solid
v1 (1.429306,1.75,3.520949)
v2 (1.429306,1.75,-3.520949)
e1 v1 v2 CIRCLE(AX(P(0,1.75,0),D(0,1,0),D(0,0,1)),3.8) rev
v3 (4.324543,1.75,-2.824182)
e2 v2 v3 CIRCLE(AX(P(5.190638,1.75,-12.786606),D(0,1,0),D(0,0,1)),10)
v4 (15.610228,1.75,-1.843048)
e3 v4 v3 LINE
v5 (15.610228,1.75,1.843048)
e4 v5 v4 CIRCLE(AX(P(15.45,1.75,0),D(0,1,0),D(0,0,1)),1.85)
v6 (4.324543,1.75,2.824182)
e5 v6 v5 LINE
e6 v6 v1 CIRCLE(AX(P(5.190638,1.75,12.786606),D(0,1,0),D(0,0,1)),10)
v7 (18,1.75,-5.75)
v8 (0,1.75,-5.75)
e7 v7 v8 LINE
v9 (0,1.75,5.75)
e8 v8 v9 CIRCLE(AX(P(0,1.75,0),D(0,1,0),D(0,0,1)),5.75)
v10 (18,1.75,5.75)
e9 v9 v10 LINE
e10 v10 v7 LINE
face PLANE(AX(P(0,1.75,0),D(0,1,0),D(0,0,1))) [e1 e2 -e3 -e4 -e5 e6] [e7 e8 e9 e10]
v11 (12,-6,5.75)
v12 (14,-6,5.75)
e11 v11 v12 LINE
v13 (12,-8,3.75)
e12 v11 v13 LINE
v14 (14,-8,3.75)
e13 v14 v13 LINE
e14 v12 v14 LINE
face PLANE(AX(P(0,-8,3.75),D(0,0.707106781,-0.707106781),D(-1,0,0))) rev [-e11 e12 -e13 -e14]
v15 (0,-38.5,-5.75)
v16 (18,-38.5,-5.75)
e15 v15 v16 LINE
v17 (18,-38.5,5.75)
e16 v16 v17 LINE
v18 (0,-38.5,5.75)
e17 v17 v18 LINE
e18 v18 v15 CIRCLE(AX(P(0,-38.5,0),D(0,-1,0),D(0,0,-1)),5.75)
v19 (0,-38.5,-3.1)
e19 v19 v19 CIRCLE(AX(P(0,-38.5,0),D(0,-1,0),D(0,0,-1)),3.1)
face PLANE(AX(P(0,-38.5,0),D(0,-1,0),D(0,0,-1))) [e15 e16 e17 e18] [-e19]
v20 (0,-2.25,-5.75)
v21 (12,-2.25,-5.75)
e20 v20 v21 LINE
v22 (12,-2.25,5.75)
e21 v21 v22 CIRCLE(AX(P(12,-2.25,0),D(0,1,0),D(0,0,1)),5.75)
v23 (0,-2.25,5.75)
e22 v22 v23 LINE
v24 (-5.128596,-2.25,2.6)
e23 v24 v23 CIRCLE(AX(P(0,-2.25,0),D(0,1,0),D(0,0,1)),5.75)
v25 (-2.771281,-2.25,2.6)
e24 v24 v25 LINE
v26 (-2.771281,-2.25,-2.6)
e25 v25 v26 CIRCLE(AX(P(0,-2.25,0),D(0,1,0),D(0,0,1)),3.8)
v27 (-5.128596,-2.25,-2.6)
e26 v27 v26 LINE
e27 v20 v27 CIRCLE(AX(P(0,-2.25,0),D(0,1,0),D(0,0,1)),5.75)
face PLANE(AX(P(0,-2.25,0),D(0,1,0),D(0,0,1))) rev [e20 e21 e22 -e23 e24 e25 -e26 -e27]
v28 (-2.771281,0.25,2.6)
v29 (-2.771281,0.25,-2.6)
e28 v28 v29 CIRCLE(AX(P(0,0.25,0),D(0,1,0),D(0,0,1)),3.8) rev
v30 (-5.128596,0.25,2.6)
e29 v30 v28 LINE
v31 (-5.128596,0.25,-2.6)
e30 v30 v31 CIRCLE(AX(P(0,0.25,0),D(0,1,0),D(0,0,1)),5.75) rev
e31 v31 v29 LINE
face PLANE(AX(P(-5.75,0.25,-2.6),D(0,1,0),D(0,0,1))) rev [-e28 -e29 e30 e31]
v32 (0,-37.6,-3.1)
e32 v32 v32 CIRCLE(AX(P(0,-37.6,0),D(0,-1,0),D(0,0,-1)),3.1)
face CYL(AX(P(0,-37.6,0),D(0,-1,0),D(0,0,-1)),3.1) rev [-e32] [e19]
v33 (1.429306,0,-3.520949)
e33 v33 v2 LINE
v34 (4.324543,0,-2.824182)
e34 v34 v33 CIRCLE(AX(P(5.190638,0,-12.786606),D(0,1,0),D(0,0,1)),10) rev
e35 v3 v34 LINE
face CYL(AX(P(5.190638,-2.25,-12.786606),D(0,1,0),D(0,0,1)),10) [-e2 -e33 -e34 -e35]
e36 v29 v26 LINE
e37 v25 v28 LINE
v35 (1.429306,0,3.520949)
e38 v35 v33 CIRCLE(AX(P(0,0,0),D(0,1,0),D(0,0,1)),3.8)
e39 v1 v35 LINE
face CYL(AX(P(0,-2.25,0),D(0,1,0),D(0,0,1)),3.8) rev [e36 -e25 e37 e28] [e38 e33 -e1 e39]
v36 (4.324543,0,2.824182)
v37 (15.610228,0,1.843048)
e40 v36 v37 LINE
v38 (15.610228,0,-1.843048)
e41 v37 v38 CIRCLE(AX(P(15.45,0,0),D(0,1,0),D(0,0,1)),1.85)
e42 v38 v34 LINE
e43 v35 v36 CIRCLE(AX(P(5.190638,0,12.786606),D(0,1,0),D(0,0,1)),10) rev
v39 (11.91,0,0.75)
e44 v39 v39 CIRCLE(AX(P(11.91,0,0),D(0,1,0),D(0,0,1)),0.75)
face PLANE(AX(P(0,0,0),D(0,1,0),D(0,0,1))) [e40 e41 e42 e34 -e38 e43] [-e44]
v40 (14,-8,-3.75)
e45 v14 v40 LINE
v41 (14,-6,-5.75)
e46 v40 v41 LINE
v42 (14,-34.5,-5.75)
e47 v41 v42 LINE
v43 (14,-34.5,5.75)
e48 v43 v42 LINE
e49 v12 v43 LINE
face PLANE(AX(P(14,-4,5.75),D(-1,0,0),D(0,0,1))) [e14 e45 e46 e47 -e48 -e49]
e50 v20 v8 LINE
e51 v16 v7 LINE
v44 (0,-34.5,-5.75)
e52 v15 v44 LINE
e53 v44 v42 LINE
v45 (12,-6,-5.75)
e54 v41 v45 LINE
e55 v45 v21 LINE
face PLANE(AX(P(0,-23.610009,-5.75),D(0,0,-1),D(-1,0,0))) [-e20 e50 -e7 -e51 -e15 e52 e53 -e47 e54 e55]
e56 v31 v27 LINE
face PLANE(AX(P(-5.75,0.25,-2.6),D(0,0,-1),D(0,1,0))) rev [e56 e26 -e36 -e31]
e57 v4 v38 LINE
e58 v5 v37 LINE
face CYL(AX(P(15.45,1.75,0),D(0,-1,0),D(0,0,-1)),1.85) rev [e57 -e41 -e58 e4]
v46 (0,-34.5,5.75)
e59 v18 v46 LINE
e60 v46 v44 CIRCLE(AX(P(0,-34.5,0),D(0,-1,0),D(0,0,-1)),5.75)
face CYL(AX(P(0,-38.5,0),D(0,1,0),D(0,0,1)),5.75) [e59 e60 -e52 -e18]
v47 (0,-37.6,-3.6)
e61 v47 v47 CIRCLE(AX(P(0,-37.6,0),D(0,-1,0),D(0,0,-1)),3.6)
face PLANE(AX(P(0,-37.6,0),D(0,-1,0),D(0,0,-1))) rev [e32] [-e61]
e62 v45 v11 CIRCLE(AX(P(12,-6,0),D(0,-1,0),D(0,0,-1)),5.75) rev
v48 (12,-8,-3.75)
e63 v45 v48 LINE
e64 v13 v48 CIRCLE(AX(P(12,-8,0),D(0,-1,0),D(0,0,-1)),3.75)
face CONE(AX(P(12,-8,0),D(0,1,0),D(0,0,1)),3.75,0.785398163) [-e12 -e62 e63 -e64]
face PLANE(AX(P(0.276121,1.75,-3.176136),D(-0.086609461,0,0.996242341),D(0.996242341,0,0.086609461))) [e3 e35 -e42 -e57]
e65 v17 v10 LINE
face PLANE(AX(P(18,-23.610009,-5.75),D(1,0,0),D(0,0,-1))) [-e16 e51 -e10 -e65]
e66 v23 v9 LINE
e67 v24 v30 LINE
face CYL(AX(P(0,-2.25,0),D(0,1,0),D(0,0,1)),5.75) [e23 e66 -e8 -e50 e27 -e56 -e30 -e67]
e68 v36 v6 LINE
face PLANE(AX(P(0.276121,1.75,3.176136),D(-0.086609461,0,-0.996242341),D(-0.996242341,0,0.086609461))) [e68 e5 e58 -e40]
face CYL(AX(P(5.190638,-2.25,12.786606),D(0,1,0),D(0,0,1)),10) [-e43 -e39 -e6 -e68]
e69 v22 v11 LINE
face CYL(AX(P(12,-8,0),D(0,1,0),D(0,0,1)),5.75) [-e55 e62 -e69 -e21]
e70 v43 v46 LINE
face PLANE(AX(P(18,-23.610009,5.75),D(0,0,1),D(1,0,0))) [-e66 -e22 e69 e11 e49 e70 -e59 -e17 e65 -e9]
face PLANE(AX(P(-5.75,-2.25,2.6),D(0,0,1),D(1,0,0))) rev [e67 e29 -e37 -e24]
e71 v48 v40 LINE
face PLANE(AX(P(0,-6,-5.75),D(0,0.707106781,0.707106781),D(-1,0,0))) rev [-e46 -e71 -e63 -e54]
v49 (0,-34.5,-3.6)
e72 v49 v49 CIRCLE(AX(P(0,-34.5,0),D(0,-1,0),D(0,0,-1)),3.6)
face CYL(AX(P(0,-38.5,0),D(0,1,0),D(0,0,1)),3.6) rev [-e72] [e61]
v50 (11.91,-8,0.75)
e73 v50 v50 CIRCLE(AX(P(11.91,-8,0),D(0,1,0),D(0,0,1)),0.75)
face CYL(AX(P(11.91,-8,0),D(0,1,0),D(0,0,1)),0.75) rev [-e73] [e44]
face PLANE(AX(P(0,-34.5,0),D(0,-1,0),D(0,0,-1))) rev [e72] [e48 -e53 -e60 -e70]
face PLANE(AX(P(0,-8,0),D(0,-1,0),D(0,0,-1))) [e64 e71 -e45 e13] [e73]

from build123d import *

# Parameters (mm, degrees)
SKETCH1_R                = 5.75
SKETCH1_R_2              = 3.8
BOSS_EXTRUDE1_DEPTH      = 2.25
BOSS_EXTRUDE2_DEPTH      = 2.25
SKETCH3_W                = 11.75
SKETCH3_H                = 11.5
BOSS_EXTRUDE3_DEPTH      = 5.75
BOSS_EXTRUDE4_START      = 1.75
BOSS_EXTRUDE4_DEPTH      = 1.75
FILLET3_R                = 10
SKETCH6_W                = 5.2
SKETCH6_H                = 2.5
CUT_EXTRUDE1_DEPTH       = 21.519807504
SKETCH7_R                = 0.75
CUT_EXTRUDE2_DEPTH       = 21.519807504
FILLET1_RADIUS           = 5.75
FILLET1_LENGTH           = 5.75
BOSS_EXTRUDE5_DEPTH      = 26.5
BOSS_EXTRUDE5_DEPTH_BACK = 4
SKETCH5_W                = 4
SKETCH5_H                = 11.5
CHAMFER1_SIZE            = 2
SKETCH8_R                = 3.6
BOSS_EXTRUDE6_DEPTH      = 4
BOSS_EXTRUDE7_START      = -0.9
SKETCH9_R                = 3.6
SKETCH9_R_2              = 3.1
BOSS_EXTRUDE7_DEPTH      = 0.9


with BuildPart() as part:
    # Sketch1 → Boss-Extrude1 (new body)
    with BuildSketch(Plane(origin=(0, 0, 0), x_dir=(1, 0, 0), z_dir=(0, 1, 0))):
        with Locations(Location((0, 0, 0), (0, 0, 270))):
            Circle(SKETCH1_R)
        with Locations(Location((0, 0, 0), (0, 0, 270))):
            Circle(SKETCH1_R_2, mode=Mode.SUBTRACT)
    extrude(amount=-BOSS_EXTRUDE1_DEPTH)

    # Sketch2 → Boss-Extrude2 (add)
    with BuildSketch(Plane(origin=(0, 0, 0), x_dir=(1, 0, 0), z_dir=(0, 1, 0))):
        with BuildLine():
            Line((0, 5.75), (18, 5.75))
            Line((18, 5.75), (18, -5.75))
            Line((18, -5.75), (0, -5.75))
            ThreePointArc((0, -5.75), (5.75, 0), (0, 5.75))
        make_face()
    extrude(amount=-BOSS_EXTRUDE2_DEPTH)

    # Sketch3 → Boss-Extrude3 (add)
    with BuildSketch(Plane.XZ.offset(2.25)):
        with Locations((12.125, 0)):
            Rectangle(SKETCH3_W, SKETCH3_H)
    extrude(amount=BOSS_EXTRUDE3_DEPTH)

    # Sketch4 → Boss-Extrude4 (add)
    with BuildSketch(Plane(origin=(0, 0, 0), x_dir=(1, 0, 0), z_dir=(0, 1, 0)).offset(BOSS_EXTRUDE4_START)):
        with BuildLine():
            Line((0, -5.75), (18, -5.75))
            Line((18, -5.75), (18, 5.75))
            Line((18, 5.75), (0, 5.75))
            ThreePointArc((0, 5.75), (-5.75, 0), (0, -5.75))
        make_face()
        with BuildLine():
            Line((2.336179457, -2.9970428), (15.610227504, -1.84304833))
            ThreePointArc((15.610227504, -1.84304833), (17.3, 0), (15.610227504, 1.84304833))
            Line((15.610227504, 1.84304833), (2.336179457, 2.9970428))
            ThreePointArc((2.336179457, 2.9970428), (-3.8, 0), (2.336179457, -2.9970428))
        make_face(mode=Mode.SUBTRACT)
    extrude(amount=-BOSS_EXTRUDE4_DEPTH)

    # Fillet3
    # the kernel refuses this fillet: 10 mm, written as the material it takes off along each edge
    with BuildSketch(Plane(origin=(2.336179457, 6.739658122, 2.9970428), x_dir=(-0.8658918638658896, 0, 0.5002312266251037), z_dir=(0, -1, 0))) as fillet3_piece_1:
        with BuildLine():
            CenterArc((2.425392956, -9.90459182), FILLET3_R, 97.920932923, 17.12578451)
            Line((-1.808178045, -0.844962877), (0, 0))
            ThreePointArc((0, 0), (0.523664388, -0.036255108), (1.047328776, 0))
        make_face()
    extrude(amount=6.739658122, mode=Mode.SUBTRACT)
    with BuildSketch(Plane(origin=(2.336179457, 6.739658122, -2.9970428), x_dir=(-0.8658918638659203, 0, -0.5002312266250502), z_dir=(0, -1, 0))) as fillet3_piece_2:
        with BuildLine():
            CenterArc((2.425392956, 9.90459182), FILLET3_R, 244.953282566, 17.12578451)
            Line((-1.808178045, 0.844962877), (0, 0))
            ThreePointArc((0, 0), (0.523664388, 0.036255108), (1.047328776, 0))
        make_face()
    extrude(amount=6.739658122, mode=Mode.SUBTRACT)

    # Sketch6 → Cut-Extrude1 (cut, through all)
    with BuildSketch(Plane(origin=(0, 0, 0), x_dir=(0, 0, -1), z_dir=(1, 0, 0))):
        with Locations((0, -1)):
            Rectangle(SKETCH6_W, SKETCH6_H)
    extrude(amount=-CUT_EXTRUDE1_DEPTH, mode=Mode.SUBTRACT)

    # Sketch7 → Cut-Extrude2 (cut, through all)
    with BuildSketch(Plane(origin=(0, 0, 0), x_dir=(1, 0, 0), z_dir=(0, 1, 0))):
        with Locations(Location((11.91, 0, 0), (0, 0, 270))):
            Circle(SKETCH7_R)
    extrude(amount=-CUT_EXTRUDE2_DEPTH, mode=Mode.SUBTRACT)

    # Fillet1: full round fillet: the end face becomes a half cylinder, R = half its width
    fillet1_face = Plane((6.25, -5.125, 0), x_dir=(0, -1, 0), z_dir=(-1, 0, 0))  # on the end face: x along it, z out of the body
    fillet1_slab = fillet1_face.offset(-FILLET1_RADIUS / 2) * Box(FILLET1_LENGTH, 2 * FILLET1_RADIUS, FILLET1_RADIUS, mode=Mode.PRIVATE)  # the body's end, R deep
    fillet1_round = Plane((12, -5.125, 0), x_dir=(-1, 0, 0), z_dir=(0, -1, 0)) * Cylinder(FILLET1_RADIUS, FILLET1_LENGTH, mode=Mode.PRIVATE)  # its axis R under the face
    add(fillet1_slab - fillet1_round, mode=Mode.SUBTRACT)

    # Sketch5 → Boss-Extrude5 (add, two sides: drawn at the far end of the back side and taken through both)
    with BuildSketch(Plane.XZ.offset(8).offset(-BOSS_EXTRUDE5_DEPTH_BACK)):
        with Locations((16, 0)):
            Rectangle(SKETCH5_W, SKETCH5_H)
    extrude(amount=BOSS_EXTRUDE5_DEPTH + BOSS_EXTRUDE5_DEPTH_BACK)

    # Chamfer1
    chamfer1_edges = [part.edges().sort_by_distance(p)[0] for p in [
        (6.25, -8, 0),
        (13, -8, 5.75),
        (13, -8, -5.75),
    ]]
    chamfer(chamfer1_edges, length=CHAMFER1_SIZE)

    # Sketch8 → Boss-Extrude6 (add)
    with BuildSketch(Plane.XZ.offset(34.5)):
        with BuildLine():
            Line((18, 5.75), (0, 5.75))
            ThreePointArc((0, 5.75), (-5.75, 0), (0, -5.75))
            Line((0, -5.75), (18, -5.75))
            Line((18, -5.75), (18, 5.75))
        make_face()
        with Locations(Location((0, 0, 0), (0, 0, 270))):
            Circle(SKETCH8_R, mode=Mode.SUBTRACT)
    extrude(amount=BOSS_EXTRUDE6_DEPTH)

    # Sketch9 → Boss-Extrude7 (add)
    with BuildSketch(Plane.XZ.offset(38.5).offset(BOSS_EXTRUDE7_START)):
        with Locations(Location((0, 0, 0), (0, 0, 270))):
            Circle(SKETCH9_R)
        with Locations(Location((0, 0, 0), (0, 0, 270))):
            Circle(SKETCH9_R_2, mode=Mode.SUBTRACT)
    extrude(amount=BOSS_EXTRUDE7_DEPTH)


solid = part.part
